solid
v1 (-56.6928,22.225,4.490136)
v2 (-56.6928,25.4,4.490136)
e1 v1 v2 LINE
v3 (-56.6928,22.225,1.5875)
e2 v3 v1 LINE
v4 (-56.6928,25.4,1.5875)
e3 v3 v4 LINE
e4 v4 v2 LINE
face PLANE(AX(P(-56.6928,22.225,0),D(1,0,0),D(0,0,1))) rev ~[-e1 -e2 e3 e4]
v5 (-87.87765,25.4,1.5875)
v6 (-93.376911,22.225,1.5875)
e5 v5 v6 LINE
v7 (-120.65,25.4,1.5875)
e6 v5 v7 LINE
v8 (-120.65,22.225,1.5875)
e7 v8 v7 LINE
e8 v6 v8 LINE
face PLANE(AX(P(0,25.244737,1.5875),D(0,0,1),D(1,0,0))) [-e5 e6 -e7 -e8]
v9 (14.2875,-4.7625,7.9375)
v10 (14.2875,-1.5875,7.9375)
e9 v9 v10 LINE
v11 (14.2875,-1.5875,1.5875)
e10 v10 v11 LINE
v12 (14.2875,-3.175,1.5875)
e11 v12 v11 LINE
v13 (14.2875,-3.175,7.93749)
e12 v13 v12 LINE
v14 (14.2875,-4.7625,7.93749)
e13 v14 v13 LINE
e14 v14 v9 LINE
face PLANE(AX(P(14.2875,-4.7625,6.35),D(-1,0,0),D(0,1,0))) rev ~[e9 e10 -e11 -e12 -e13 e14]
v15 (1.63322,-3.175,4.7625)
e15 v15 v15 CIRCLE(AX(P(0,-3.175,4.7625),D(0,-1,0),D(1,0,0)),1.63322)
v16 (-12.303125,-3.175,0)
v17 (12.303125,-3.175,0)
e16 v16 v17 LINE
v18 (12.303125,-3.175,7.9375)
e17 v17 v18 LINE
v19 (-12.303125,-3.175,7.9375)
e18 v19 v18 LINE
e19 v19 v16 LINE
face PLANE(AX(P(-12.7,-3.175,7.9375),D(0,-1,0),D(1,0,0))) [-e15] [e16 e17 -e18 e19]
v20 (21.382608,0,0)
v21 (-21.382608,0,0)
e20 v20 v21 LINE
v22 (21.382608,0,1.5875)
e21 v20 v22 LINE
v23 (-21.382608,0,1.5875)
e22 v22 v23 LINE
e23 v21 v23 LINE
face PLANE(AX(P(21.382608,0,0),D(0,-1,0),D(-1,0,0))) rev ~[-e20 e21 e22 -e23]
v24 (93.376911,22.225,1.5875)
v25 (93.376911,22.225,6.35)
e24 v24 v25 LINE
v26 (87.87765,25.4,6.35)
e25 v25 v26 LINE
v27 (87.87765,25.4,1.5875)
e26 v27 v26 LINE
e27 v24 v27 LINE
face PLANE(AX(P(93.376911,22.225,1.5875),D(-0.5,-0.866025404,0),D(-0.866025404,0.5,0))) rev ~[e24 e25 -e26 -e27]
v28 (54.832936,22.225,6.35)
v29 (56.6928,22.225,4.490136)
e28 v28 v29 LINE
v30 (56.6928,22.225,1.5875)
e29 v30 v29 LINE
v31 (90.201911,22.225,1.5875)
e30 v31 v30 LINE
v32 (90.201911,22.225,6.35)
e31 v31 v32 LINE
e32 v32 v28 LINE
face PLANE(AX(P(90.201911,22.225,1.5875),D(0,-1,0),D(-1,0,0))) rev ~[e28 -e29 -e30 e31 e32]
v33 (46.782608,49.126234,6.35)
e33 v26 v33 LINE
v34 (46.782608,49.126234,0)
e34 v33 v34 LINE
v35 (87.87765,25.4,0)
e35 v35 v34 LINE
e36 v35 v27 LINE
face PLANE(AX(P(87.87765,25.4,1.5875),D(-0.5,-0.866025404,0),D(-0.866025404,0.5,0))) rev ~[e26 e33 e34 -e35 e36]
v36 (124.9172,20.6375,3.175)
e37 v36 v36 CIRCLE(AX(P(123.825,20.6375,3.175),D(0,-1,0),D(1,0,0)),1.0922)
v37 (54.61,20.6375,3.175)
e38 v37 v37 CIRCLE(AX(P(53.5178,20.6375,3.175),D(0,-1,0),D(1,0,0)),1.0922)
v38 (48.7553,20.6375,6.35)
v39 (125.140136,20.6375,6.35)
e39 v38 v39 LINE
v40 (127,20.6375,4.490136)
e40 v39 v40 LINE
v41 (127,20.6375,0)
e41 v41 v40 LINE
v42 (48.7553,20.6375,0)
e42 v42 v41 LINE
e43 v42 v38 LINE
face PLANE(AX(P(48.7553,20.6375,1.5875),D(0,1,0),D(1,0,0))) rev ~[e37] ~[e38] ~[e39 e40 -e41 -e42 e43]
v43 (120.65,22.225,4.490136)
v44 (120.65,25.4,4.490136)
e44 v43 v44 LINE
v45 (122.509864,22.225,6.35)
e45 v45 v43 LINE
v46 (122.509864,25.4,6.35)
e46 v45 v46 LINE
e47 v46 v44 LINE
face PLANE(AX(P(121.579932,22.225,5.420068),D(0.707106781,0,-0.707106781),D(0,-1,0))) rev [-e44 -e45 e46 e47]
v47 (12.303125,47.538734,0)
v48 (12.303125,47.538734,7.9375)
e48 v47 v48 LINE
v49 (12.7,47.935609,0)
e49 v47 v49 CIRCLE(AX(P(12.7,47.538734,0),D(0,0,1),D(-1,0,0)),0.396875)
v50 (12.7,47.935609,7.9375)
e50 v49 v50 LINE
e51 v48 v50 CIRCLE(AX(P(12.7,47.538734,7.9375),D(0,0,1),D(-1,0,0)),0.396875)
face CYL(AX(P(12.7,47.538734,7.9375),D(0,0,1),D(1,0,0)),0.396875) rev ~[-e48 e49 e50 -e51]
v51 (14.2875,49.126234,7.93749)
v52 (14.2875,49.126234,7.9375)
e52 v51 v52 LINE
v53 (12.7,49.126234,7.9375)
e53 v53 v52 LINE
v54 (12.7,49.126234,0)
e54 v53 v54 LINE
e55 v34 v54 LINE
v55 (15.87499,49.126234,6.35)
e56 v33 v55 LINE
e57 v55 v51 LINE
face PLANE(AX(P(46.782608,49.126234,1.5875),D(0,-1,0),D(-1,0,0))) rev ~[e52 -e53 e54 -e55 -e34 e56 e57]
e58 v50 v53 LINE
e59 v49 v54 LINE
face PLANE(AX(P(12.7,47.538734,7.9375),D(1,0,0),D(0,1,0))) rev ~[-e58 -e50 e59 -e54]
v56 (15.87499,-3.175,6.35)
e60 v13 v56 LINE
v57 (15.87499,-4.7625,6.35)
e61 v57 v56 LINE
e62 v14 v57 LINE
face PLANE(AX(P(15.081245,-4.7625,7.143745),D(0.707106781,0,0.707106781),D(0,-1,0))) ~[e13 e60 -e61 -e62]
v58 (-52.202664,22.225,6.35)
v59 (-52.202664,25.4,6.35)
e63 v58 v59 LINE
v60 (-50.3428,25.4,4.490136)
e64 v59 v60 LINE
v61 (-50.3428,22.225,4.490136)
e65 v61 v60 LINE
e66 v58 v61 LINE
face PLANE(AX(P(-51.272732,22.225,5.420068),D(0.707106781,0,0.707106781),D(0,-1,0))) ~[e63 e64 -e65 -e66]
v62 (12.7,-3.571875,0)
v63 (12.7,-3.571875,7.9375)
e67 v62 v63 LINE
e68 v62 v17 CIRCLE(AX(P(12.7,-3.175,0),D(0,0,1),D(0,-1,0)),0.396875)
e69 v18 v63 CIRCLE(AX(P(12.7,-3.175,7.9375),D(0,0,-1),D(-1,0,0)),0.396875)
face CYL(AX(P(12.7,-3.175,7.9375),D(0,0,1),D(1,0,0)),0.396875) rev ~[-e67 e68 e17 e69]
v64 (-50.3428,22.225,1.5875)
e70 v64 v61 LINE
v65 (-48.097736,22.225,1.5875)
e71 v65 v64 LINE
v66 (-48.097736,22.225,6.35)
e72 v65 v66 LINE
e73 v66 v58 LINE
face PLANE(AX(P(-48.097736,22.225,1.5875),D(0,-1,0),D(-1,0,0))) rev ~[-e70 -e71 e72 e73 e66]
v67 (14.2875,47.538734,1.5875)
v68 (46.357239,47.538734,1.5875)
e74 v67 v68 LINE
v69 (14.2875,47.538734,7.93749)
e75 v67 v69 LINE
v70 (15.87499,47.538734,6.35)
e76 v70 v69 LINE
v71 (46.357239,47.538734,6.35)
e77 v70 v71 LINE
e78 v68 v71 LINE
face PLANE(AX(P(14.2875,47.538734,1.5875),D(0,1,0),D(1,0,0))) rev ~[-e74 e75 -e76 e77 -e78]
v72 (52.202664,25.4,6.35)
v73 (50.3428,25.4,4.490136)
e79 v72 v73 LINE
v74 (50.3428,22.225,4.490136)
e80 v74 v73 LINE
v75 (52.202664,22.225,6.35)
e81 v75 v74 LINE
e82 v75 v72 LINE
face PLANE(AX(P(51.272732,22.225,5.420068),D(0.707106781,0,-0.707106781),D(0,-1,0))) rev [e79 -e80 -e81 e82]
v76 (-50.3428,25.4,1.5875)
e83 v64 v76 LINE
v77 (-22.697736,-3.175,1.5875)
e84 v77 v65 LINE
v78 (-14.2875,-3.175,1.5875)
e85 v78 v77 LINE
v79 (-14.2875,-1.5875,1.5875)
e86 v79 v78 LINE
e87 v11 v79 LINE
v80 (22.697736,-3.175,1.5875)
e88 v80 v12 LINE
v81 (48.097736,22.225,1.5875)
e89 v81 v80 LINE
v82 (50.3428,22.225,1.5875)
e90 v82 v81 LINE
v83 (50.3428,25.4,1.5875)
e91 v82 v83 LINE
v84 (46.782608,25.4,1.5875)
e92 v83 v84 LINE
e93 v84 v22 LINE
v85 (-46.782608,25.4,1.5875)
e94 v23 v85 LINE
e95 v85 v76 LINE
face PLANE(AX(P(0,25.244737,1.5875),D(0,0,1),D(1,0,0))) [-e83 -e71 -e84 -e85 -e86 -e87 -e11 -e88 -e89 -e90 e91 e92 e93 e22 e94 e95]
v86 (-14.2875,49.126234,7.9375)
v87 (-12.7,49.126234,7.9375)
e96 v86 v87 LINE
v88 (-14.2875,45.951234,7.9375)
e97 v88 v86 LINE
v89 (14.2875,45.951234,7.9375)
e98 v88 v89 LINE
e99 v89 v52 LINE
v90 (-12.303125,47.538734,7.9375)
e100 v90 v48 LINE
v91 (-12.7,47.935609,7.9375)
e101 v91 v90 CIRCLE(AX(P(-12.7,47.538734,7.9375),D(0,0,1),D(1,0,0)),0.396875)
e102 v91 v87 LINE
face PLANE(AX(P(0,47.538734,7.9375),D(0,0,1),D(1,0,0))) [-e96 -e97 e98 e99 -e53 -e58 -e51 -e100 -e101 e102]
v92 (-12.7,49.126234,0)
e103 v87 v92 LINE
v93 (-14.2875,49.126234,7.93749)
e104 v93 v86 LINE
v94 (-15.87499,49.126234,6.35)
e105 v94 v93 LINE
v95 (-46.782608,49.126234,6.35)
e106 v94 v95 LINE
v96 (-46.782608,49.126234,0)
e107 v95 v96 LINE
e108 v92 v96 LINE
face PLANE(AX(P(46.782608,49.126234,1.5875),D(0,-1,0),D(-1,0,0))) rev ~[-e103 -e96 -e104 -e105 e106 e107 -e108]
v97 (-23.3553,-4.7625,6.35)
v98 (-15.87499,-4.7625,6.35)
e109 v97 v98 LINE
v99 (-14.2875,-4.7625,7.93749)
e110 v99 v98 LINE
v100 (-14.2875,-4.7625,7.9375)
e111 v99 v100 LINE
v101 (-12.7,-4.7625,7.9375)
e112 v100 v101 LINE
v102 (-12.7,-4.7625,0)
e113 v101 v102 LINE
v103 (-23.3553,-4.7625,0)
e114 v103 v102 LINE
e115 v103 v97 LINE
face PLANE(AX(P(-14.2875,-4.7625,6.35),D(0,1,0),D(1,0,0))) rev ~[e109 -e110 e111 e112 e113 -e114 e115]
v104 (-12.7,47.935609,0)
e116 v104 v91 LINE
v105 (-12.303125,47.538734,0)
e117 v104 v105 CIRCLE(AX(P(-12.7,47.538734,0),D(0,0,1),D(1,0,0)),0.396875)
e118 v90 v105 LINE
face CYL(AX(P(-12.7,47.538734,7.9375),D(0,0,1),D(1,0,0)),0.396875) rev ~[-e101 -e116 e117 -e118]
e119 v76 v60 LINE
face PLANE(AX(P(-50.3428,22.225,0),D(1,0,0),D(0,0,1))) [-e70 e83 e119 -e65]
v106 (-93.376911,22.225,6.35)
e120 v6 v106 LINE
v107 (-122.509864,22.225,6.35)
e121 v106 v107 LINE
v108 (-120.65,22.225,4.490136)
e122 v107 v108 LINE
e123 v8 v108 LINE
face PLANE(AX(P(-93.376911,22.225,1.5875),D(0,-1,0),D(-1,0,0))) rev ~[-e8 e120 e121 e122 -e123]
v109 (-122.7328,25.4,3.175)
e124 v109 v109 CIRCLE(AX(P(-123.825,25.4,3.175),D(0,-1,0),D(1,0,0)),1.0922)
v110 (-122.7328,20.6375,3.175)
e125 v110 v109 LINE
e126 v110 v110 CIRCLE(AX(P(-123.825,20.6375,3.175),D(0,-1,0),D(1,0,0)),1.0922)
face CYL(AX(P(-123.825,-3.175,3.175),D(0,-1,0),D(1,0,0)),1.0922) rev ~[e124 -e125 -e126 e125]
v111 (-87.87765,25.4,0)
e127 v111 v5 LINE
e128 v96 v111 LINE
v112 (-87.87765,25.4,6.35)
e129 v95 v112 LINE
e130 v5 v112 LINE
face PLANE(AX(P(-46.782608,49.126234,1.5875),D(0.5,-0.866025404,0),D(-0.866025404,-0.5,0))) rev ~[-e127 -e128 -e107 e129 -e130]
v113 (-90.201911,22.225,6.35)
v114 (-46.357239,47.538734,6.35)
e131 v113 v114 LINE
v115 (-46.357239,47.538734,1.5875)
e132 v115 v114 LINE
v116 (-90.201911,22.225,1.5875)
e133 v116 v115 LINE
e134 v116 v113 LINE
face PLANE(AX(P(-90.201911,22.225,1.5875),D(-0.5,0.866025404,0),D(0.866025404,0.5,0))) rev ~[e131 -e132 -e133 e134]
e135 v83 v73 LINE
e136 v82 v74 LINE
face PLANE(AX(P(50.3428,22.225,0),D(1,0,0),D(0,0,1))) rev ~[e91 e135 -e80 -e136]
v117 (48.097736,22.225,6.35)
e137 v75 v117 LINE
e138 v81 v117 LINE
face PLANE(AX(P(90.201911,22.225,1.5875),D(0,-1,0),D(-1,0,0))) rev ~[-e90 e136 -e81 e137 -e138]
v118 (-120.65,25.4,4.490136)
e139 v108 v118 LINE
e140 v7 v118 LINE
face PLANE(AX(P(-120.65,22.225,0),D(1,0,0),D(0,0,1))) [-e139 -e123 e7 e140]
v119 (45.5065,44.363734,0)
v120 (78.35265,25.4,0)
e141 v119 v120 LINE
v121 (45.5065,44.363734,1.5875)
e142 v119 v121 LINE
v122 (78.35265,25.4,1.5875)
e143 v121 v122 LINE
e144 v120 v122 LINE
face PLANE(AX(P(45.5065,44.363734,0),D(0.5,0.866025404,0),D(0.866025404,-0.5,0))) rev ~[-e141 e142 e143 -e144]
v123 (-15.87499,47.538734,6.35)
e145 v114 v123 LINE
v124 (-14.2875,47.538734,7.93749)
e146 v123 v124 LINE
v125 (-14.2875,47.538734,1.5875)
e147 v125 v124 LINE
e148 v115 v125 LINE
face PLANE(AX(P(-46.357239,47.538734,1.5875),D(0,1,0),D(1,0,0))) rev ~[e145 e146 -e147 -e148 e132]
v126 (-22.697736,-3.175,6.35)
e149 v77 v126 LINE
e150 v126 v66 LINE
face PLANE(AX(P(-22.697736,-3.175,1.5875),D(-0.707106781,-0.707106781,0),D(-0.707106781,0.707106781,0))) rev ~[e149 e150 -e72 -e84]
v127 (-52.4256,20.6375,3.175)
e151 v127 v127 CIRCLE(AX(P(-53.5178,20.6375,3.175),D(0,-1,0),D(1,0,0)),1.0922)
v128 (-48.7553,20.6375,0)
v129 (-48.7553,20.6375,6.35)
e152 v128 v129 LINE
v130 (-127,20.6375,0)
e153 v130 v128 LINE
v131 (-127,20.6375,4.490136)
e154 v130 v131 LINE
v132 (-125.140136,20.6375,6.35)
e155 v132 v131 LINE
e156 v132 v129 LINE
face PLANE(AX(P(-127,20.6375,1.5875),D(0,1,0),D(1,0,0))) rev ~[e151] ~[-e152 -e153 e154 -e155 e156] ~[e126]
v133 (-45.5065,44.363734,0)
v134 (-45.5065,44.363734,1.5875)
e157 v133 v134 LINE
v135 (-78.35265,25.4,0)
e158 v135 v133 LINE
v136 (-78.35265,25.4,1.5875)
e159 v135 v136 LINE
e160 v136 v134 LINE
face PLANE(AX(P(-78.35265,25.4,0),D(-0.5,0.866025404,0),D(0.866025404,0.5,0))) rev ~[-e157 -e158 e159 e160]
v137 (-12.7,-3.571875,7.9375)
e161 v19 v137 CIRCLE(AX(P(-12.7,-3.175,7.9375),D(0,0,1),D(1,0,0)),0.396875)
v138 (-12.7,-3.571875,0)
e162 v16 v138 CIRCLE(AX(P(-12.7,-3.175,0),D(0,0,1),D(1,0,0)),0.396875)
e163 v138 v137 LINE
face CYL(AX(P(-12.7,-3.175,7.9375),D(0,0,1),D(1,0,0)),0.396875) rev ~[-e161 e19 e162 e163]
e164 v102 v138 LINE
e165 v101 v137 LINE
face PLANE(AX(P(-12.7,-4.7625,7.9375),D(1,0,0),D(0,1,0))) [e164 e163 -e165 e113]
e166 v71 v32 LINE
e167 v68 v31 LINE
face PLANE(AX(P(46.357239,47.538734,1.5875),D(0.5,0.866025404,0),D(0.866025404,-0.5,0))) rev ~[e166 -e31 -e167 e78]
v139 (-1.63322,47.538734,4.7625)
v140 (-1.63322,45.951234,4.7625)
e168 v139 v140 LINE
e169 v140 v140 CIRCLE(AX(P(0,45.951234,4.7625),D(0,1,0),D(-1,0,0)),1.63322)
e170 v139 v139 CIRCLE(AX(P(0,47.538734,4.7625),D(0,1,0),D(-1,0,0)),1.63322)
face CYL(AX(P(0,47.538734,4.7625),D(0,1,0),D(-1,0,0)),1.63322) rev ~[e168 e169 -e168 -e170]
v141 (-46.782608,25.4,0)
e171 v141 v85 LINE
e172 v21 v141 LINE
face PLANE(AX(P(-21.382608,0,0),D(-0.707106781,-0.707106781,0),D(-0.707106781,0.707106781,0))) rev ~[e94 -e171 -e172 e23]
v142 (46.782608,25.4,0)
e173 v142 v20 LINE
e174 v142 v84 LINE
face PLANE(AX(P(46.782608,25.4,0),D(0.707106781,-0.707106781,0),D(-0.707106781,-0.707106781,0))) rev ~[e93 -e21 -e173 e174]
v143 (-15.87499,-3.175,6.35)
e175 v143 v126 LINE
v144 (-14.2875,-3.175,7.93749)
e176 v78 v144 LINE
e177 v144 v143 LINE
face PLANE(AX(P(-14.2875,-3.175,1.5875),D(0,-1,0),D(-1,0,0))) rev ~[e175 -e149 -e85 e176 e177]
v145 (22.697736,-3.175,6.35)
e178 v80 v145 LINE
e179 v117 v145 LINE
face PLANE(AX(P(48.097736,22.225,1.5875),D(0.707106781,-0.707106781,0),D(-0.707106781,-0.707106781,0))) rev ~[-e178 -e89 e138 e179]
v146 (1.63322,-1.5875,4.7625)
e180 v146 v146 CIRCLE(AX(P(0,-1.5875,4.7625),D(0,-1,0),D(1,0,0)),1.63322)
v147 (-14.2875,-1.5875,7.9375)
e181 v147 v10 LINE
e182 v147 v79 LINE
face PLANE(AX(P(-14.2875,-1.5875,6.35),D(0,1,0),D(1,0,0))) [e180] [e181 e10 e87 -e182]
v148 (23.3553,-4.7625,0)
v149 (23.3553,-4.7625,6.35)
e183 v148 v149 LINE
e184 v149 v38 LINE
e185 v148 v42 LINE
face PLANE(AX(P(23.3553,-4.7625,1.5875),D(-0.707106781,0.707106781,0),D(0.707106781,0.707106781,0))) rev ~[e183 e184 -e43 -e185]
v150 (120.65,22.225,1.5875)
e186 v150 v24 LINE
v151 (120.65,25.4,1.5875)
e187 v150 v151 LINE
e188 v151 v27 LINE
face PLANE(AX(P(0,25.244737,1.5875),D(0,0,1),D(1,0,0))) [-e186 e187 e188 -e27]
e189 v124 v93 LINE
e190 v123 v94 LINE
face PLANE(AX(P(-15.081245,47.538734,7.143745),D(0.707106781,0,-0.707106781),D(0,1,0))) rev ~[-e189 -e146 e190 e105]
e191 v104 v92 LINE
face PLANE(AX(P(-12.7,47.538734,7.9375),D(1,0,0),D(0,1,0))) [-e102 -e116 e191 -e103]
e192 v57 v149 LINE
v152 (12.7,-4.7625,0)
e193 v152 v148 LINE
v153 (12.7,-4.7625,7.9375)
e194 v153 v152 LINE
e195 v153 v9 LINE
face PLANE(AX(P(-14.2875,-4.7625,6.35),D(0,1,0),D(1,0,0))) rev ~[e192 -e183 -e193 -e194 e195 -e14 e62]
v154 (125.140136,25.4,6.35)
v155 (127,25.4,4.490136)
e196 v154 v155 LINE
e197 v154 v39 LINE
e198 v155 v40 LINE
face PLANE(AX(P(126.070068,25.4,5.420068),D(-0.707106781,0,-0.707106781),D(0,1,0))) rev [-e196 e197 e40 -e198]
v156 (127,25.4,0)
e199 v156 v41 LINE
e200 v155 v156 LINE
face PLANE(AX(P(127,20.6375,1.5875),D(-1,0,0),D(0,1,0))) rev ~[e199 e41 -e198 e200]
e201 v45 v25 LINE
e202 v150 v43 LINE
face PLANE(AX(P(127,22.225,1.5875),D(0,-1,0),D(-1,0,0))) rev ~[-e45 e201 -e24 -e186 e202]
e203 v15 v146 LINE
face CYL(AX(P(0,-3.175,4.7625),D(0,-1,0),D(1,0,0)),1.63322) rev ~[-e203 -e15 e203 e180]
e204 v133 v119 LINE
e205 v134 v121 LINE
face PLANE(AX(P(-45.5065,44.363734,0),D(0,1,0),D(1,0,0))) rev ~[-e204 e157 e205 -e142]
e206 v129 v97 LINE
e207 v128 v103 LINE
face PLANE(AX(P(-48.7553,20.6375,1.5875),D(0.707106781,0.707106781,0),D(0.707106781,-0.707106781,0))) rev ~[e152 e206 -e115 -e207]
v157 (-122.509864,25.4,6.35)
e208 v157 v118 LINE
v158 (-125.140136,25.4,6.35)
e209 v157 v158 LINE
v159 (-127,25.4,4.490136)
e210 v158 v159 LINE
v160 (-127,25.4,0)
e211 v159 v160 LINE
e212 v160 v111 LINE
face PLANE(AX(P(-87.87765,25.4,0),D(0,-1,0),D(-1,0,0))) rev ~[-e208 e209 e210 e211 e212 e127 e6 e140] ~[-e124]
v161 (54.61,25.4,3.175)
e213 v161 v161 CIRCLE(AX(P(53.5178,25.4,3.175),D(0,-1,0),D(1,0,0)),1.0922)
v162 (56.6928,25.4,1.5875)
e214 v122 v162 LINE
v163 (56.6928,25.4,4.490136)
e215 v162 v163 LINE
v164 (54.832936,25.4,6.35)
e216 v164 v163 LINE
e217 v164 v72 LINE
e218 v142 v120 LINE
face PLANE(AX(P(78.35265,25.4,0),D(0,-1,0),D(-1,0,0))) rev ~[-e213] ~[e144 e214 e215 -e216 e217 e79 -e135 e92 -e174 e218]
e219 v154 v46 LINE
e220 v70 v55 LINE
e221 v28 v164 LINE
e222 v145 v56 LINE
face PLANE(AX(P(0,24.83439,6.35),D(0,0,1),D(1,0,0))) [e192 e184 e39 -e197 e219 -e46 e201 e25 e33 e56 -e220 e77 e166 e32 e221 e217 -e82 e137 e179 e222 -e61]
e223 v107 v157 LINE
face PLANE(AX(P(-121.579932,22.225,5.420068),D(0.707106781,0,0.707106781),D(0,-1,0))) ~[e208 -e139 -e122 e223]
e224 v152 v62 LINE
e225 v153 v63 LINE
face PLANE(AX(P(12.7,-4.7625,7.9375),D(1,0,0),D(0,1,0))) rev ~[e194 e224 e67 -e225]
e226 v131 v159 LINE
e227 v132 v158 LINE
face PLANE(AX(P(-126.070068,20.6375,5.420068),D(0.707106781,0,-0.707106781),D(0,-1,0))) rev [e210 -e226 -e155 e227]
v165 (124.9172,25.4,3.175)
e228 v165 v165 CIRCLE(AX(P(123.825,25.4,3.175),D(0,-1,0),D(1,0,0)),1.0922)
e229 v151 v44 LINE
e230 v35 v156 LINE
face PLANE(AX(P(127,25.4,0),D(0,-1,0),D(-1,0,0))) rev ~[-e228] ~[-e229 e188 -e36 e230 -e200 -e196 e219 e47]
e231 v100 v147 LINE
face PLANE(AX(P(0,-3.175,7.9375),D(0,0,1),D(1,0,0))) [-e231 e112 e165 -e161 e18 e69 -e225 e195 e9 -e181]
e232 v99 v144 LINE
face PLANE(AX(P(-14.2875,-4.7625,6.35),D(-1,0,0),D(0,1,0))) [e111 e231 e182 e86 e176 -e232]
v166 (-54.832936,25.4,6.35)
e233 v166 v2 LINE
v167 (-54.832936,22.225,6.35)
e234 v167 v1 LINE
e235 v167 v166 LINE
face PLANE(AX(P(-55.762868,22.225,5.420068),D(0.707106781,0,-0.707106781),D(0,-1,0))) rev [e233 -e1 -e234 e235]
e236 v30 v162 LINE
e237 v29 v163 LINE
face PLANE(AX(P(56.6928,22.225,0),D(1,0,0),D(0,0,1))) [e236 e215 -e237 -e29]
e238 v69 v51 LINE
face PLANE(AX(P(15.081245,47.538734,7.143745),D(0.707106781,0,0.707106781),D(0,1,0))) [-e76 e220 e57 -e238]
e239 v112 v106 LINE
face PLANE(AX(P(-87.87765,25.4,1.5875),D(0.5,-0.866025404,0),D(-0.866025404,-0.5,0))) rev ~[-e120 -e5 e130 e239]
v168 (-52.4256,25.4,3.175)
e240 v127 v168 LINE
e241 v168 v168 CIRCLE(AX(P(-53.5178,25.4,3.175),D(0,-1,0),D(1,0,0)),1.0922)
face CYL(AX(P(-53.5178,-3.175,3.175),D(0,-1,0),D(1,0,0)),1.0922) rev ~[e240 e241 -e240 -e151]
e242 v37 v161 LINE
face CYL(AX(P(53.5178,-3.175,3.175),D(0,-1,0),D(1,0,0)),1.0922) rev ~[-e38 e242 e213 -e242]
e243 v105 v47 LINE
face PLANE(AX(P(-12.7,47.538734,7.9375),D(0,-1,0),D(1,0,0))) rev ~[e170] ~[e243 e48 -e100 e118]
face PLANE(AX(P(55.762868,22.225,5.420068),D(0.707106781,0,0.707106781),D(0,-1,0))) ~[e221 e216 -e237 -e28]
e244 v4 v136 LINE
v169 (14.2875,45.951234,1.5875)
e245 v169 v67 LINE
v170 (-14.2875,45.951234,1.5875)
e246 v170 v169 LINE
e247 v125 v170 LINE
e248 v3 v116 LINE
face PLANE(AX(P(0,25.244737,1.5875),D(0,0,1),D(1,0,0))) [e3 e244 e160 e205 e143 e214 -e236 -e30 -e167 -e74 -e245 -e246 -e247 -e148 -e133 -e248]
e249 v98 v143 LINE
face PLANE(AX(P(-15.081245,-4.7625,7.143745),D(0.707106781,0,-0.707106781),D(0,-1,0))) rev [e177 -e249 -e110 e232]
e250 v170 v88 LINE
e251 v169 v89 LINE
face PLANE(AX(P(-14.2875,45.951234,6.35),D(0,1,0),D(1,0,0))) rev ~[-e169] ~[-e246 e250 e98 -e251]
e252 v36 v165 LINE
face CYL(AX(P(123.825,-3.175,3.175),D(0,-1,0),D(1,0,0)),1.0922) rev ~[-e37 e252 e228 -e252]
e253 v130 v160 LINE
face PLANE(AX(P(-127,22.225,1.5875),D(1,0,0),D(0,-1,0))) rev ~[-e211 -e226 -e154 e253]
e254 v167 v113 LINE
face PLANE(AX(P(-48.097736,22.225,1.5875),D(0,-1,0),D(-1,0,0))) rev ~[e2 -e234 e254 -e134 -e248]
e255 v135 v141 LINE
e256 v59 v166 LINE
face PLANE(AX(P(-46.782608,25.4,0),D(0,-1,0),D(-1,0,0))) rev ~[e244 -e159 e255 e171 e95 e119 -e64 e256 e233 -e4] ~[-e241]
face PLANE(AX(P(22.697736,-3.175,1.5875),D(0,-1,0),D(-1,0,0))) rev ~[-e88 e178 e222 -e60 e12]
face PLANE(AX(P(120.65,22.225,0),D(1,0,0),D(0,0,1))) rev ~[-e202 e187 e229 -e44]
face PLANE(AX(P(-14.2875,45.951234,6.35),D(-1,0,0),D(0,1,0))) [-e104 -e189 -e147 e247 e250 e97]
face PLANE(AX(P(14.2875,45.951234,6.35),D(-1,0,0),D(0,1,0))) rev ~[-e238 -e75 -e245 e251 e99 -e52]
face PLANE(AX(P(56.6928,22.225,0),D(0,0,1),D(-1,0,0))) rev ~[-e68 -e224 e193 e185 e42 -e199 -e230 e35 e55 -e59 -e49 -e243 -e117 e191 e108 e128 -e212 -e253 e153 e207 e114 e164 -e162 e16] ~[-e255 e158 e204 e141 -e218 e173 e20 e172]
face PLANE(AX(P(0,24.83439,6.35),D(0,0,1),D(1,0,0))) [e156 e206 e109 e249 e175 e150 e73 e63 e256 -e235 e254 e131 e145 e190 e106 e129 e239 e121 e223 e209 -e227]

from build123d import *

# Parameters (mm, degrees)
F1_DEPTH  = 1.5875
F3_DEPTH  = 4.7625
F4_W      = 6.35
F4_H      = 6.35
F5_DEPTH  = 3.175
F6_SIZE   = 1.8598642
F7_W      = 28.575
F7_H      = 3.175
F8_DEPTH  = 1.5875
F9_W      = 25.4
F9_H      = 1.5875
F10_DEPTH = 7.9375
F11_R     = 1.0922
F11_R_2   = 1.63322
F12_DEPTH = 28.575
F13_SIZE  = 1.58749
F14_R     = 0.396875
F15_DEPTH = 7.9375
F16_R     = 1.63322
F17_DEPTH = 1.5875


# Not quite as in the source:
# - a fillet or chamfer is up to 0.001 mm smaller than in the source, because OpenCascade refuses the exact size


with BuildPart() as f1:
    # F0 (on Top) → F1 (new body)
    with BuildSketch(Plane.XY):
        Polygon((-87.87765, 25.4), (-127, 25.4), (-127, 20.6375), (-48.7553, 20.6375), (-23.3553, -4.7625), (23.3553, -4.7625), (48.7553, 20.6375), (127, 20.6375), (127, 25.4), (87.87765, 25.4), (46.7826079092, 49.1262336135), (-46.7826079092, 49.1262336135), align=None)
        Polygon((-21.3826079092, 0), (-46.7826079092, 25.4), (-78.35265, 25.4), (-45.5064998802, 44.3637336135), (45.5064998802, 44.3637336135), (78.35265, 25.4), (46.7826079092, 25.4), (21.3826079092, 0), align=None, mode=Mode.SUBTRACT)
    extrude(amount=F1_DEPTH)

    # F2 (on face) → F3 (join)
    with BuildSketch(Plane.XY.offset(1.5875)):
        Polygon((-127, 22.225), (-127, 20.6375), (-48.7553, 20.6375), (-23.3553, -4.7625), (23.3553, -4.7625), (48.7553, 20.6375), (127, 20.6375), (127, 22.225), (93.376911314, 22.225), (87.87765, 25.4), (46.7826079092, 49.1262336135), (-46.7826079092, 49.1262336135), (-87.87765, 25.4), (-93.376911314, 22.225), align=None)
        Polygon((90.201911314, 22.225), (48.0977359697, 22.225), (22.6977359697, -3.175), (14.2875, -3.175), (14.2875, -1.5875), (-14.2875, -1.5875), (-14.2875, -3.175), (-22.6977359697, -3.175), (-48.0977359697, 22.225), (-90.201911314, 22.225), (-46.3572385662, 47.5387336135), (-14.2875, 47.5387336135), (-14.2875, 45.9512336135), (14.2875, 45.9512336135), (14.2875, 47.5387336135), (46.3572385662, 47.5387336135), align=None, mode=Mode.SUBTRACT)
    extrude(amount=F3_DEPTH)

    # F4 (on face) → F5 (join, through all)
    with BuildSketch(Plane(origin=(0, 22.225, 0), x_dir=(-1, 0, 0), z_dir=(0, 1, 0))):
        with Locations((-53.5178, 3.175)):
            Rectangle(F4_W, F4_H)
        with Locations((-123.825, 3.175)):
            Rectangle(F4_W, F4_H)
        with Locations((123.825, 3.175)):
            Rectangle(F4_W, F4_H)
        with Locations((53.5178, 3.175)):
            Rectangle(F4_W, F4_H)
    extrude(amount=F5_DEPTH)

    # F6
    f6_edges = [f1.edges().sort_by_distance(p)[0] for p in [
        (-127, 23.01875, 6.35),
        (-120.65, 23.8125, 6.35),
        (-56.6928, 23.8125, 6.35),
        (-50.3428, 23.8125, 6.35),
        (50.3428, 23.8125, 6.35),
        (56.6928, 23.8125, 6.35),
        (120.65, 23.8125, 6.35),
        (127, 23.01875, 6.35),
    ]]
    chamfer(f6_edges, length=F6_SIZE)

    # F7 (on face) → F8 (join)
    with BuildSketch(Plane.XY.offset(6.35)):
        with Locations((0, -3.175)):
            Rectangle(F7_W, F7_H)
        with Locations((0, 47.5387336135)):
            Rectangle(F7_W, F7_H)
    extrude(amount=F8_DEPTH)

    # F9 (on face) → F10 (cut, through all)
    with BuildSketch(Plane.XY.offset(7.9375)):
        with Locations((0, -3.96875)):
            Rectangle(F9_W, F9_H)
        with Locations((0, 48.3324836135)):
            Rectangle(F9_W, F9_H)
    extrude(amount=-F10_DEPTH, mode=Mode.SUBTRACT)

    # F11 (on face) → F12 (cut, through all)
    with BuildSketch(Plane.XZ.offset(3.175)):
        with Locations((53.5178, 3.175)):
            Circle(F11_R)
        with Locations((123.825, 3.175)):
            Circle(F11_R)
        with Locations((-123.825, 3.175)):
            Circle(F11_R)
        with Locations((-53.5178, 3.175)):
            Circle(F11_R)
        with Locations((0, 4.7625)):
            Circle(F11_R_2)
    extrude(amount=-F12_DEPTH, mode=Mode.SUBTRACT)

    # F13 (size 1.5875 in the source; OpenCascade refuses exactly that, so slightly less here)
    f13_edges = [f1.edges().sort_by_distance(p)[0] for p in [
        (-14.2875, -3.96875, 6.35),
        (14.2875, -3.96875, 6.35),
        (-14.2875, 48.332484, 6.35),
        (14.2875, 48.332484, 6.35),
    ]]
    chamfer(f13_edges, length=F13_SIZE)

    # F14 (on face) → F15 (cut, through all)
    with BuildSketch(Plane.XY.offset(7.9375)):
        with Locations((-12.7, -3.175)):
            Circle(F14_R)
        with Locations((12.7, -3.175)):
            Circle(F14_R)
        with Locations((12.7, 47.5387336135)):
            Circle(F14_R)
        with Locations((-12.7, 47.5387336135)):
            Circle(F14_R)
    extrude(amount=-F15_DEPTH, mode=Mode.SUBTRACT)

    # F16 (on face) → F17 (cut, through all)
    with BuildSketch(Plane(origin=(0, 47.5387336135, 0), x_dir=(-1, 0, 0), z_dir=(0, 1, 0))):
        with Locations((0, 4.7625)):
            Circle(F16_R)
    extrude(amount=-F17_DEPTH, mode=Mode.SUBTRACT)


solid = f1.part
